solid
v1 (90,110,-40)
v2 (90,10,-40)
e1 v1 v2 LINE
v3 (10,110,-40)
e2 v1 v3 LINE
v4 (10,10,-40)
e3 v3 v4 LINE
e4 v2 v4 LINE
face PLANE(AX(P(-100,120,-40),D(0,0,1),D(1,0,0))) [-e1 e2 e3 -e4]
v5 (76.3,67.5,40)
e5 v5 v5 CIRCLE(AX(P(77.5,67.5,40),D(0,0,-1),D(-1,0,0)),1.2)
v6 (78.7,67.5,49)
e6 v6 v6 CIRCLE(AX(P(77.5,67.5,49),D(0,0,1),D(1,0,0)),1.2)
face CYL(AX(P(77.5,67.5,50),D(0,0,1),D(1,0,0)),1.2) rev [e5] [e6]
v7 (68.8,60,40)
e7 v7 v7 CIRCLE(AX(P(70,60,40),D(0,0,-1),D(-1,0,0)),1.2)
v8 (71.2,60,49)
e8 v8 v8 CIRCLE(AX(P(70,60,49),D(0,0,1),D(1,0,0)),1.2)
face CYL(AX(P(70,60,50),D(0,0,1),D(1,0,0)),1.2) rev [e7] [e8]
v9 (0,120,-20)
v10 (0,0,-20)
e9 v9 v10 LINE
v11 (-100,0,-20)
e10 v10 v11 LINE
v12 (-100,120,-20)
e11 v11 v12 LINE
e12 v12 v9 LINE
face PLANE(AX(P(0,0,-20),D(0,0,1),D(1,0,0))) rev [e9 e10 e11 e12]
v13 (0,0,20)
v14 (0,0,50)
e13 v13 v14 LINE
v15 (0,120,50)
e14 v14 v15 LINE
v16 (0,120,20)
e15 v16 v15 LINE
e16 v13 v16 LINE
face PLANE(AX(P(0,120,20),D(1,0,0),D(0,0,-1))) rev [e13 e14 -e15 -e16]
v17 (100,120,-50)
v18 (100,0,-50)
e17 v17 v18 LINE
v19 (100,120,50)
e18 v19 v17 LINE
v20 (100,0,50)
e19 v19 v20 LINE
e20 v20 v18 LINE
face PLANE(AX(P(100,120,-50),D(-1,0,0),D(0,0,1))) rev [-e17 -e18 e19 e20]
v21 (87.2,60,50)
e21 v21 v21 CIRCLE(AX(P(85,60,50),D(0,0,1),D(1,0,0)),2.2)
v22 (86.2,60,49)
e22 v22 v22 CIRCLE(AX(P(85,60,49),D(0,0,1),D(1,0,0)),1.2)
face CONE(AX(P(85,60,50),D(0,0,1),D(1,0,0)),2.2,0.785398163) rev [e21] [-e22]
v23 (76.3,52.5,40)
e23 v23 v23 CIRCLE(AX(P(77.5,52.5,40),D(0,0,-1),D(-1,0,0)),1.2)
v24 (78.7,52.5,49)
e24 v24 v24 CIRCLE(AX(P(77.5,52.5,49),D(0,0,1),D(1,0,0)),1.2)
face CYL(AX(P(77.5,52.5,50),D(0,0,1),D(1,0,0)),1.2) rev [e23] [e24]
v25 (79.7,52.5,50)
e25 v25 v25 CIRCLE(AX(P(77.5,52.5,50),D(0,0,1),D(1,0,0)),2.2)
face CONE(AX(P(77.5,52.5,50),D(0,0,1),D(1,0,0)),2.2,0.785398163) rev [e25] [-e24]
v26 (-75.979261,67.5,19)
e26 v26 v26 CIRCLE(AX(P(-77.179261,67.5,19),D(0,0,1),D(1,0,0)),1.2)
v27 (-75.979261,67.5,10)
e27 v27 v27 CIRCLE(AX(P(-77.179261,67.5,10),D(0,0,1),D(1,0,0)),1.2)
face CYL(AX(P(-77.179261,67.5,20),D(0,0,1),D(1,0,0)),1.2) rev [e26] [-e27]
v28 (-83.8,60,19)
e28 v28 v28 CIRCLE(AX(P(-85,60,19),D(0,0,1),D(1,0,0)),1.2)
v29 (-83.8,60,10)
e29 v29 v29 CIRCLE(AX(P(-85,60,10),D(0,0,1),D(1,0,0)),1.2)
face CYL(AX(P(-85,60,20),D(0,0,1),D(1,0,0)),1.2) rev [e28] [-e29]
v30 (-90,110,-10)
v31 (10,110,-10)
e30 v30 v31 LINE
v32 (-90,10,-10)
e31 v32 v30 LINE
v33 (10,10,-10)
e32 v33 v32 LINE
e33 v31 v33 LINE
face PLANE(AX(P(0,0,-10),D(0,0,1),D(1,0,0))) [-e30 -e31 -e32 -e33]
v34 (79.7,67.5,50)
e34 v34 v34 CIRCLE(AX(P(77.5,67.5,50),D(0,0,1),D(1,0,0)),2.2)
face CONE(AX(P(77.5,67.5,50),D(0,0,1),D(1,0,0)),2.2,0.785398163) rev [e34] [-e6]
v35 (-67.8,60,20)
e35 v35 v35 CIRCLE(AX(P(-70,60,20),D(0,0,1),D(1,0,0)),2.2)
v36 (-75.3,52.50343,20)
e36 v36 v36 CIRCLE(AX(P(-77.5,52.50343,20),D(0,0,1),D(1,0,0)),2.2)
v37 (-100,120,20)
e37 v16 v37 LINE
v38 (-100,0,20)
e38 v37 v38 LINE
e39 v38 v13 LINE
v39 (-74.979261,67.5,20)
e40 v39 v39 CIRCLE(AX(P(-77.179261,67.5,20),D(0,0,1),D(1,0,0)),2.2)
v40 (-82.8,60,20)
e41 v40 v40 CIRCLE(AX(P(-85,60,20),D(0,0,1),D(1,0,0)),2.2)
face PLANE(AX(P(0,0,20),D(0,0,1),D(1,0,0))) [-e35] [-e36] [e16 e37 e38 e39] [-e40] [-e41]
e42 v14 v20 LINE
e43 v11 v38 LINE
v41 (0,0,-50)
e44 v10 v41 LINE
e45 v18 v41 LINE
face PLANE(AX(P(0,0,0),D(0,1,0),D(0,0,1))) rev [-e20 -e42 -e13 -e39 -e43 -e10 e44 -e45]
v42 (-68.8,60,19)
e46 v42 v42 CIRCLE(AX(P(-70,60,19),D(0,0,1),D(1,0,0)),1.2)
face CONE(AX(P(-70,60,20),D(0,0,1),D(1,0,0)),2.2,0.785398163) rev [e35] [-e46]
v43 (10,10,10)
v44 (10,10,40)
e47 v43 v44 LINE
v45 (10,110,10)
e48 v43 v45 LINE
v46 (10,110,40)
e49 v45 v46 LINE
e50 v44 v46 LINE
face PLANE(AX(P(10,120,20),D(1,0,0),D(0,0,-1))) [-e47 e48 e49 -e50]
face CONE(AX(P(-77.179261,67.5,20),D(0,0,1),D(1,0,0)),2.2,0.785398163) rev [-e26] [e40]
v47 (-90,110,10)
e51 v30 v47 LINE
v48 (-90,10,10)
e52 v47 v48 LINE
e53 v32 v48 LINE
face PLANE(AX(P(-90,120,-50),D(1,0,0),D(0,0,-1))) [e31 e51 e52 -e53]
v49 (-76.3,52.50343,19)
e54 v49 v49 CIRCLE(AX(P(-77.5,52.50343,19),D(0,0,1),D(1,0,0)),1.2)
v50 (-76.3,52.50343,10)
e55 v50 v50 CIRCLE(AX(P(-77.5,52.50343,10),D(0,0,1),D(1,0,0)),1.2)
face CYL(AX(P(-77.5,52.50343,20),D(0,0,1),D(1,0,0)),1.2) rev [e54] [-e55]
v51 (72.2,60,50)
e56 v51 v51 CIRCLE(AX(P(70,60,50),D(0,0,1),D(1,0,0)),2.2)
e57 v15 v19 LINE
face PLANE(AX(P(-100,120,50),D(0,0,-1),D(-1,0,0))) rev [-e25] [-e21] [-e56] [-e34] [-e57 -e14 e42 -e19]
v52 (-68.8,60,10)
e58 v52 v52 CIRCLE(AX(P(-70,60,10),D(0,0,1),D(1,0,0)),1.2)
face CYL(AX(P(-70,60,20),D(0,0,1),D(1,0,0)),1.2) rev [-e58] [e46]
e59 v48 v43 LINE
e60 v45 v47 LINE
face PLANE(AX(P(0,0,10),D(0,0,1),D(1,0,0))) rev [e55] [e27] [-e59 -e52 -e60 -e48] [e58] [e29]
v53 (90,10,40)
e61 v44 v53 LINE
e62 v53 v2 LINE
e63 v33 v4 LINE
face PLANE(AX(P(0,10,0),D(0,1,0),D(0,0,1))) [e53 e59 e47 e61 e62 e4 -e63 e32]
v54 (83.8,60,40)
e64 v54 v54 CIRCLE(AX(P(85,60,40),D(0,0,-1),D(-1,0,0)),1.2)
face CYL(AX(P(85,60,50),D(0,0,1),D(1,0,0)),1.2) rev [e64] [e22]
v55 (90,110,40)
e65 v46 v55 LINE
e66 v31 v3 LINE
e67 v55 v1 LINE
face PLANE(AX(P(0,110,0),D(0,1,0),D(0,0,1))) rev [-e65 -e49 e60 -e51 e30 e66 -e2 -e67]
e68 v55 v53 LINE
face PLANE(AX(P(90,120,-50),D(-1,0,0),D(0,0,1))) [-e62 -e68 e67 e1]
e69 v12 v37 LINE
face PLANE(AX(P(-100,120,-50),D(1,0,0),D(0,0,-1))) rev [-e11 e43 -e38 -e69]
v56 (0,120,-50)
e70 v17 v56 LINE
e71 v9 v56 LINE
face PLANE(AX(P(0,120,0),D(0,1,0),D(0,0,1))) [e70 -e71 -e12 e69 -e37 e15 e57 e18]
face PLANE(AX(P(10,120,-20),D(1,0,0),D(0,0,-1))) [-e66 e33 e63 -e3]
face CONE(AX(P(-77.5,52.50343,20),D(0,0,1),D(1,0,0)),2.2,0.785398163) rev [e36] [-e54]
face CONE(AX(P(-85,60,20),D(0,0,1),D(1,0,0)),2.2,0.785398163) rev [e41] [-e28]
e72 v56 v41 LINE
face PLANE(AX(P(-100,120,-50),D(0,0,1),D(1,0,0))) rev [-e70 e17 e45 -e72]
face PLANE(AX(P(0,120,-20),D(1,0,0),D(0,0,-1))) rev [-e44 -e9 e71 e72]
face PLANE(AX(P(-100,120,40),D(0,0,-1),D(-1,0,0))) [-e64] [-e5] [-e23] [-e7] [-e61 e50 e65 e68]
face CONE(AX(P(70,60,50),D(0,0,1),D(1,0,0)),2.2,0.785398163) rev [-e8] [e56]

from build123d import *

# Parameters (mm, degrees)
SKETCH3_W                                       = 200
SKETCH3_H                                       = 100
BOSS_EXTRUDE2_DEPTH                             = 120
SKETCH4_W                                       = 100
SKETCH4_H                                       = 120
CUT_EXTRUDE1_DEPTH                              = 30
SKETCH5_W                                       = 100
SKETCH5_H                                       = 120
CUT_EXTRUDE2_DEPTH                              = 30
SHELL1_START                                    = 10
SHELL1_OUTLINE_W                                = 100
SHELL1_OUTLINE_H                                = 80
SHELL1_DEPTH                                    = 80
SHELL1_START_2                                  = -90
SHELL1_2_OUTLINE_W                              = 100
SHELL1_2_OUTLINE_H                              = 20
SHELL1_2_DEPTH                                  = 100
CSK_FOR_M2_FLAT_HEAD_MACHINE_SCREW1_D           = 2.4
CSK_FOR_M2_FLAT_HEAD_MACHINE_SCREW1_DEPTH       = 15
CSK_FOR_M2_FLAT_HEAD_MACHINE_SCREW1_CSINK_D     = 4.4
CSK_FOR_M2_FLAT_HEAD_MACHINE_SCREW1_CSINK_ANGLE = 90
CSK_FOR_M2_FLAT_HEAD_MACHINE_SCREW1_TIP         = 0.721032743
CSK_FOR_M2_FLAT_HEAD_MACHINE_SCREW2_D           = 2.4
CSK_FOR_M2_FLAT_HEAD_MACHINE_SCREW2_DEPTH       = 15
CSK_FOR_M2_FLAT_HEAD_MACHINE_SCREW2_CSINK_D     = 4.4
CSK_FOR_M2_FLAT_HEAD_MACHINE_SCREW2_CSINK_ANGLE = 90
CSK_FOR_M2_FLAT_HEAD_MACHINE_SCREW2_TIP         = 0.721032743


# Read off the part's stored shape, not the designer's step: Shell1
with BuildPart() as part:
    # Sketch3 → Boss-Extrude2 (new body)
    with BuildSketch(Plane(origin=(0, 0, 0), x_dir=(1, 0, 0), z_dir=(0, 1, 0))):
        Rectangle(SKETCH3_W, SKETCH3_H)
    extrude(amount=BOSS_EXTRUDE2_DEPTH)

    # Sketch4 → Cut-Extrude1 (cut)
    with BuildSketch(Plane.XY.offset(50)):
        with Locations((-50, 60)):
            Rectangle(SKETCH4_W, SKETCH4_H)
    extrude(amount=-CUT_EXTRUDE1_DEPTH, mode=Mode.SUBTRACT)

    # Sketch5 → Cut-Extrude2 (cut)
    with BuildSketch(Plane(origin=(0, 0, -50), x_dir=(-1, 0, 0), z_dir=(0, 0, -1))):
        with Locations((50, 60)):
            Rectangle(SKETCH5_W, SKETCH5_H)
    extrude(amount=-CUT_EXTRUDE2_DEPTH, mode=Mode.SUBTRACT)

    # Shell1 outline → Shell1 (cut)
    with BuildSketch(Plane.YZ.offset(SHELL1_START)):
        with Locations((60, 0)):
            Rectangle(SHELL1_OUTLINE_W, SHELL1_OUTLINE_H)
    extrude(amount=SHELL1_DEPTH, mode=Mode.SUBTRACT)

    # Shell1 2 outline → Shell1 2 (cut)
    with BuildSketch(Plane.YZ.offset(SHELL1_START_2)):
        with Locations((60, 0)):
            Rectangle(SHELL1_2_OUTLINE_W, SHELL1_2_OUTLINE_H)
    extrude(amount=SHELL1_2_DEPTH, mode=Mode.SUBTRACT)

    # CSK for M2 Flat Head Machine Screw1
    with Locations(Plane.XY.offset(50)):
        with Locations((85, 60), (70, 60), (77.5, 67.5), (77.5, 52.5)):
            CounterSinkHole(CSK_FOR_M2_FLAT_HEAD_MACHINE_SCREW1_D / 2, CSK_FOR_M2_FLAT_HEAD_MACHINE_SCREW1_CSINK_D / 2, depth=CSK_FOR_M2_FLAT_HEAD_MACHINE_SCREW1_DEPTH, counter_sink_angle=CSK_FOR_M2_FLAT_HEAD_MACHINE_SCREW1_CSINK_ANGLE)
            with Locations((0, 0, -(CSK_FOR_M2_FLAT_HEAD_MACHINE_SCREW1_DEPTH + CSK_FOR_M2_FLAT_HEAD_MACHINE_SCREW1_TIP / 2))):  # 118° drill point
                Cone(0, CSK_FOR_M2_FLAT_HEAD_MACHINE_SCREW1_D / 2, CSK_FOR_M2_FLAT_HEAD_MACHINE_SCREW1_TIP, mode=Mode.SUBTRACT)

    # CSK for M2 Flat Head Machine Screw2
    with Locations(Plane.XY.offset(20)):
        with Locations((-85, 60), (-77.179261413, 67.5), (-70, 60), (-77.5, 52.5034295)):
            CounterSinkHole(CSK_FOR_M2_FLAT_HEAD_MACHINE_SCREW2_D / 2, CSK_FOR_M2_FLAT_HEAD_MACHINE_SCREW2_CSINK_D / 2, depth=CSK_FOR_M2_FLAT_HEAD_MACHINE_SCREW2_DEPTH, counter_sink_angle=CSK_FOR_M2_FLAT_HEAD_MACHINE_SCREW2_CSINK_ANGLE)
            with Locations((0, 0, -(CSK_FOR_M2_FLAT_HEAD_MACHINE_SCREW2_DEPTH + CSK_FOR_M2_FLAT_HEAD_MACHINE_SCREW2_TIP / 2))):  # 118° drill point
                Cone(0, CSK_FOR_M2_FLAT_HEAD_MACHINE_SCREW2_D / 2, CSK_FOR_M2_FLAT_HEAD_MACHINE_SCREW2_TIP, mode=Mode.SUBTRACT)


solid = part.part
